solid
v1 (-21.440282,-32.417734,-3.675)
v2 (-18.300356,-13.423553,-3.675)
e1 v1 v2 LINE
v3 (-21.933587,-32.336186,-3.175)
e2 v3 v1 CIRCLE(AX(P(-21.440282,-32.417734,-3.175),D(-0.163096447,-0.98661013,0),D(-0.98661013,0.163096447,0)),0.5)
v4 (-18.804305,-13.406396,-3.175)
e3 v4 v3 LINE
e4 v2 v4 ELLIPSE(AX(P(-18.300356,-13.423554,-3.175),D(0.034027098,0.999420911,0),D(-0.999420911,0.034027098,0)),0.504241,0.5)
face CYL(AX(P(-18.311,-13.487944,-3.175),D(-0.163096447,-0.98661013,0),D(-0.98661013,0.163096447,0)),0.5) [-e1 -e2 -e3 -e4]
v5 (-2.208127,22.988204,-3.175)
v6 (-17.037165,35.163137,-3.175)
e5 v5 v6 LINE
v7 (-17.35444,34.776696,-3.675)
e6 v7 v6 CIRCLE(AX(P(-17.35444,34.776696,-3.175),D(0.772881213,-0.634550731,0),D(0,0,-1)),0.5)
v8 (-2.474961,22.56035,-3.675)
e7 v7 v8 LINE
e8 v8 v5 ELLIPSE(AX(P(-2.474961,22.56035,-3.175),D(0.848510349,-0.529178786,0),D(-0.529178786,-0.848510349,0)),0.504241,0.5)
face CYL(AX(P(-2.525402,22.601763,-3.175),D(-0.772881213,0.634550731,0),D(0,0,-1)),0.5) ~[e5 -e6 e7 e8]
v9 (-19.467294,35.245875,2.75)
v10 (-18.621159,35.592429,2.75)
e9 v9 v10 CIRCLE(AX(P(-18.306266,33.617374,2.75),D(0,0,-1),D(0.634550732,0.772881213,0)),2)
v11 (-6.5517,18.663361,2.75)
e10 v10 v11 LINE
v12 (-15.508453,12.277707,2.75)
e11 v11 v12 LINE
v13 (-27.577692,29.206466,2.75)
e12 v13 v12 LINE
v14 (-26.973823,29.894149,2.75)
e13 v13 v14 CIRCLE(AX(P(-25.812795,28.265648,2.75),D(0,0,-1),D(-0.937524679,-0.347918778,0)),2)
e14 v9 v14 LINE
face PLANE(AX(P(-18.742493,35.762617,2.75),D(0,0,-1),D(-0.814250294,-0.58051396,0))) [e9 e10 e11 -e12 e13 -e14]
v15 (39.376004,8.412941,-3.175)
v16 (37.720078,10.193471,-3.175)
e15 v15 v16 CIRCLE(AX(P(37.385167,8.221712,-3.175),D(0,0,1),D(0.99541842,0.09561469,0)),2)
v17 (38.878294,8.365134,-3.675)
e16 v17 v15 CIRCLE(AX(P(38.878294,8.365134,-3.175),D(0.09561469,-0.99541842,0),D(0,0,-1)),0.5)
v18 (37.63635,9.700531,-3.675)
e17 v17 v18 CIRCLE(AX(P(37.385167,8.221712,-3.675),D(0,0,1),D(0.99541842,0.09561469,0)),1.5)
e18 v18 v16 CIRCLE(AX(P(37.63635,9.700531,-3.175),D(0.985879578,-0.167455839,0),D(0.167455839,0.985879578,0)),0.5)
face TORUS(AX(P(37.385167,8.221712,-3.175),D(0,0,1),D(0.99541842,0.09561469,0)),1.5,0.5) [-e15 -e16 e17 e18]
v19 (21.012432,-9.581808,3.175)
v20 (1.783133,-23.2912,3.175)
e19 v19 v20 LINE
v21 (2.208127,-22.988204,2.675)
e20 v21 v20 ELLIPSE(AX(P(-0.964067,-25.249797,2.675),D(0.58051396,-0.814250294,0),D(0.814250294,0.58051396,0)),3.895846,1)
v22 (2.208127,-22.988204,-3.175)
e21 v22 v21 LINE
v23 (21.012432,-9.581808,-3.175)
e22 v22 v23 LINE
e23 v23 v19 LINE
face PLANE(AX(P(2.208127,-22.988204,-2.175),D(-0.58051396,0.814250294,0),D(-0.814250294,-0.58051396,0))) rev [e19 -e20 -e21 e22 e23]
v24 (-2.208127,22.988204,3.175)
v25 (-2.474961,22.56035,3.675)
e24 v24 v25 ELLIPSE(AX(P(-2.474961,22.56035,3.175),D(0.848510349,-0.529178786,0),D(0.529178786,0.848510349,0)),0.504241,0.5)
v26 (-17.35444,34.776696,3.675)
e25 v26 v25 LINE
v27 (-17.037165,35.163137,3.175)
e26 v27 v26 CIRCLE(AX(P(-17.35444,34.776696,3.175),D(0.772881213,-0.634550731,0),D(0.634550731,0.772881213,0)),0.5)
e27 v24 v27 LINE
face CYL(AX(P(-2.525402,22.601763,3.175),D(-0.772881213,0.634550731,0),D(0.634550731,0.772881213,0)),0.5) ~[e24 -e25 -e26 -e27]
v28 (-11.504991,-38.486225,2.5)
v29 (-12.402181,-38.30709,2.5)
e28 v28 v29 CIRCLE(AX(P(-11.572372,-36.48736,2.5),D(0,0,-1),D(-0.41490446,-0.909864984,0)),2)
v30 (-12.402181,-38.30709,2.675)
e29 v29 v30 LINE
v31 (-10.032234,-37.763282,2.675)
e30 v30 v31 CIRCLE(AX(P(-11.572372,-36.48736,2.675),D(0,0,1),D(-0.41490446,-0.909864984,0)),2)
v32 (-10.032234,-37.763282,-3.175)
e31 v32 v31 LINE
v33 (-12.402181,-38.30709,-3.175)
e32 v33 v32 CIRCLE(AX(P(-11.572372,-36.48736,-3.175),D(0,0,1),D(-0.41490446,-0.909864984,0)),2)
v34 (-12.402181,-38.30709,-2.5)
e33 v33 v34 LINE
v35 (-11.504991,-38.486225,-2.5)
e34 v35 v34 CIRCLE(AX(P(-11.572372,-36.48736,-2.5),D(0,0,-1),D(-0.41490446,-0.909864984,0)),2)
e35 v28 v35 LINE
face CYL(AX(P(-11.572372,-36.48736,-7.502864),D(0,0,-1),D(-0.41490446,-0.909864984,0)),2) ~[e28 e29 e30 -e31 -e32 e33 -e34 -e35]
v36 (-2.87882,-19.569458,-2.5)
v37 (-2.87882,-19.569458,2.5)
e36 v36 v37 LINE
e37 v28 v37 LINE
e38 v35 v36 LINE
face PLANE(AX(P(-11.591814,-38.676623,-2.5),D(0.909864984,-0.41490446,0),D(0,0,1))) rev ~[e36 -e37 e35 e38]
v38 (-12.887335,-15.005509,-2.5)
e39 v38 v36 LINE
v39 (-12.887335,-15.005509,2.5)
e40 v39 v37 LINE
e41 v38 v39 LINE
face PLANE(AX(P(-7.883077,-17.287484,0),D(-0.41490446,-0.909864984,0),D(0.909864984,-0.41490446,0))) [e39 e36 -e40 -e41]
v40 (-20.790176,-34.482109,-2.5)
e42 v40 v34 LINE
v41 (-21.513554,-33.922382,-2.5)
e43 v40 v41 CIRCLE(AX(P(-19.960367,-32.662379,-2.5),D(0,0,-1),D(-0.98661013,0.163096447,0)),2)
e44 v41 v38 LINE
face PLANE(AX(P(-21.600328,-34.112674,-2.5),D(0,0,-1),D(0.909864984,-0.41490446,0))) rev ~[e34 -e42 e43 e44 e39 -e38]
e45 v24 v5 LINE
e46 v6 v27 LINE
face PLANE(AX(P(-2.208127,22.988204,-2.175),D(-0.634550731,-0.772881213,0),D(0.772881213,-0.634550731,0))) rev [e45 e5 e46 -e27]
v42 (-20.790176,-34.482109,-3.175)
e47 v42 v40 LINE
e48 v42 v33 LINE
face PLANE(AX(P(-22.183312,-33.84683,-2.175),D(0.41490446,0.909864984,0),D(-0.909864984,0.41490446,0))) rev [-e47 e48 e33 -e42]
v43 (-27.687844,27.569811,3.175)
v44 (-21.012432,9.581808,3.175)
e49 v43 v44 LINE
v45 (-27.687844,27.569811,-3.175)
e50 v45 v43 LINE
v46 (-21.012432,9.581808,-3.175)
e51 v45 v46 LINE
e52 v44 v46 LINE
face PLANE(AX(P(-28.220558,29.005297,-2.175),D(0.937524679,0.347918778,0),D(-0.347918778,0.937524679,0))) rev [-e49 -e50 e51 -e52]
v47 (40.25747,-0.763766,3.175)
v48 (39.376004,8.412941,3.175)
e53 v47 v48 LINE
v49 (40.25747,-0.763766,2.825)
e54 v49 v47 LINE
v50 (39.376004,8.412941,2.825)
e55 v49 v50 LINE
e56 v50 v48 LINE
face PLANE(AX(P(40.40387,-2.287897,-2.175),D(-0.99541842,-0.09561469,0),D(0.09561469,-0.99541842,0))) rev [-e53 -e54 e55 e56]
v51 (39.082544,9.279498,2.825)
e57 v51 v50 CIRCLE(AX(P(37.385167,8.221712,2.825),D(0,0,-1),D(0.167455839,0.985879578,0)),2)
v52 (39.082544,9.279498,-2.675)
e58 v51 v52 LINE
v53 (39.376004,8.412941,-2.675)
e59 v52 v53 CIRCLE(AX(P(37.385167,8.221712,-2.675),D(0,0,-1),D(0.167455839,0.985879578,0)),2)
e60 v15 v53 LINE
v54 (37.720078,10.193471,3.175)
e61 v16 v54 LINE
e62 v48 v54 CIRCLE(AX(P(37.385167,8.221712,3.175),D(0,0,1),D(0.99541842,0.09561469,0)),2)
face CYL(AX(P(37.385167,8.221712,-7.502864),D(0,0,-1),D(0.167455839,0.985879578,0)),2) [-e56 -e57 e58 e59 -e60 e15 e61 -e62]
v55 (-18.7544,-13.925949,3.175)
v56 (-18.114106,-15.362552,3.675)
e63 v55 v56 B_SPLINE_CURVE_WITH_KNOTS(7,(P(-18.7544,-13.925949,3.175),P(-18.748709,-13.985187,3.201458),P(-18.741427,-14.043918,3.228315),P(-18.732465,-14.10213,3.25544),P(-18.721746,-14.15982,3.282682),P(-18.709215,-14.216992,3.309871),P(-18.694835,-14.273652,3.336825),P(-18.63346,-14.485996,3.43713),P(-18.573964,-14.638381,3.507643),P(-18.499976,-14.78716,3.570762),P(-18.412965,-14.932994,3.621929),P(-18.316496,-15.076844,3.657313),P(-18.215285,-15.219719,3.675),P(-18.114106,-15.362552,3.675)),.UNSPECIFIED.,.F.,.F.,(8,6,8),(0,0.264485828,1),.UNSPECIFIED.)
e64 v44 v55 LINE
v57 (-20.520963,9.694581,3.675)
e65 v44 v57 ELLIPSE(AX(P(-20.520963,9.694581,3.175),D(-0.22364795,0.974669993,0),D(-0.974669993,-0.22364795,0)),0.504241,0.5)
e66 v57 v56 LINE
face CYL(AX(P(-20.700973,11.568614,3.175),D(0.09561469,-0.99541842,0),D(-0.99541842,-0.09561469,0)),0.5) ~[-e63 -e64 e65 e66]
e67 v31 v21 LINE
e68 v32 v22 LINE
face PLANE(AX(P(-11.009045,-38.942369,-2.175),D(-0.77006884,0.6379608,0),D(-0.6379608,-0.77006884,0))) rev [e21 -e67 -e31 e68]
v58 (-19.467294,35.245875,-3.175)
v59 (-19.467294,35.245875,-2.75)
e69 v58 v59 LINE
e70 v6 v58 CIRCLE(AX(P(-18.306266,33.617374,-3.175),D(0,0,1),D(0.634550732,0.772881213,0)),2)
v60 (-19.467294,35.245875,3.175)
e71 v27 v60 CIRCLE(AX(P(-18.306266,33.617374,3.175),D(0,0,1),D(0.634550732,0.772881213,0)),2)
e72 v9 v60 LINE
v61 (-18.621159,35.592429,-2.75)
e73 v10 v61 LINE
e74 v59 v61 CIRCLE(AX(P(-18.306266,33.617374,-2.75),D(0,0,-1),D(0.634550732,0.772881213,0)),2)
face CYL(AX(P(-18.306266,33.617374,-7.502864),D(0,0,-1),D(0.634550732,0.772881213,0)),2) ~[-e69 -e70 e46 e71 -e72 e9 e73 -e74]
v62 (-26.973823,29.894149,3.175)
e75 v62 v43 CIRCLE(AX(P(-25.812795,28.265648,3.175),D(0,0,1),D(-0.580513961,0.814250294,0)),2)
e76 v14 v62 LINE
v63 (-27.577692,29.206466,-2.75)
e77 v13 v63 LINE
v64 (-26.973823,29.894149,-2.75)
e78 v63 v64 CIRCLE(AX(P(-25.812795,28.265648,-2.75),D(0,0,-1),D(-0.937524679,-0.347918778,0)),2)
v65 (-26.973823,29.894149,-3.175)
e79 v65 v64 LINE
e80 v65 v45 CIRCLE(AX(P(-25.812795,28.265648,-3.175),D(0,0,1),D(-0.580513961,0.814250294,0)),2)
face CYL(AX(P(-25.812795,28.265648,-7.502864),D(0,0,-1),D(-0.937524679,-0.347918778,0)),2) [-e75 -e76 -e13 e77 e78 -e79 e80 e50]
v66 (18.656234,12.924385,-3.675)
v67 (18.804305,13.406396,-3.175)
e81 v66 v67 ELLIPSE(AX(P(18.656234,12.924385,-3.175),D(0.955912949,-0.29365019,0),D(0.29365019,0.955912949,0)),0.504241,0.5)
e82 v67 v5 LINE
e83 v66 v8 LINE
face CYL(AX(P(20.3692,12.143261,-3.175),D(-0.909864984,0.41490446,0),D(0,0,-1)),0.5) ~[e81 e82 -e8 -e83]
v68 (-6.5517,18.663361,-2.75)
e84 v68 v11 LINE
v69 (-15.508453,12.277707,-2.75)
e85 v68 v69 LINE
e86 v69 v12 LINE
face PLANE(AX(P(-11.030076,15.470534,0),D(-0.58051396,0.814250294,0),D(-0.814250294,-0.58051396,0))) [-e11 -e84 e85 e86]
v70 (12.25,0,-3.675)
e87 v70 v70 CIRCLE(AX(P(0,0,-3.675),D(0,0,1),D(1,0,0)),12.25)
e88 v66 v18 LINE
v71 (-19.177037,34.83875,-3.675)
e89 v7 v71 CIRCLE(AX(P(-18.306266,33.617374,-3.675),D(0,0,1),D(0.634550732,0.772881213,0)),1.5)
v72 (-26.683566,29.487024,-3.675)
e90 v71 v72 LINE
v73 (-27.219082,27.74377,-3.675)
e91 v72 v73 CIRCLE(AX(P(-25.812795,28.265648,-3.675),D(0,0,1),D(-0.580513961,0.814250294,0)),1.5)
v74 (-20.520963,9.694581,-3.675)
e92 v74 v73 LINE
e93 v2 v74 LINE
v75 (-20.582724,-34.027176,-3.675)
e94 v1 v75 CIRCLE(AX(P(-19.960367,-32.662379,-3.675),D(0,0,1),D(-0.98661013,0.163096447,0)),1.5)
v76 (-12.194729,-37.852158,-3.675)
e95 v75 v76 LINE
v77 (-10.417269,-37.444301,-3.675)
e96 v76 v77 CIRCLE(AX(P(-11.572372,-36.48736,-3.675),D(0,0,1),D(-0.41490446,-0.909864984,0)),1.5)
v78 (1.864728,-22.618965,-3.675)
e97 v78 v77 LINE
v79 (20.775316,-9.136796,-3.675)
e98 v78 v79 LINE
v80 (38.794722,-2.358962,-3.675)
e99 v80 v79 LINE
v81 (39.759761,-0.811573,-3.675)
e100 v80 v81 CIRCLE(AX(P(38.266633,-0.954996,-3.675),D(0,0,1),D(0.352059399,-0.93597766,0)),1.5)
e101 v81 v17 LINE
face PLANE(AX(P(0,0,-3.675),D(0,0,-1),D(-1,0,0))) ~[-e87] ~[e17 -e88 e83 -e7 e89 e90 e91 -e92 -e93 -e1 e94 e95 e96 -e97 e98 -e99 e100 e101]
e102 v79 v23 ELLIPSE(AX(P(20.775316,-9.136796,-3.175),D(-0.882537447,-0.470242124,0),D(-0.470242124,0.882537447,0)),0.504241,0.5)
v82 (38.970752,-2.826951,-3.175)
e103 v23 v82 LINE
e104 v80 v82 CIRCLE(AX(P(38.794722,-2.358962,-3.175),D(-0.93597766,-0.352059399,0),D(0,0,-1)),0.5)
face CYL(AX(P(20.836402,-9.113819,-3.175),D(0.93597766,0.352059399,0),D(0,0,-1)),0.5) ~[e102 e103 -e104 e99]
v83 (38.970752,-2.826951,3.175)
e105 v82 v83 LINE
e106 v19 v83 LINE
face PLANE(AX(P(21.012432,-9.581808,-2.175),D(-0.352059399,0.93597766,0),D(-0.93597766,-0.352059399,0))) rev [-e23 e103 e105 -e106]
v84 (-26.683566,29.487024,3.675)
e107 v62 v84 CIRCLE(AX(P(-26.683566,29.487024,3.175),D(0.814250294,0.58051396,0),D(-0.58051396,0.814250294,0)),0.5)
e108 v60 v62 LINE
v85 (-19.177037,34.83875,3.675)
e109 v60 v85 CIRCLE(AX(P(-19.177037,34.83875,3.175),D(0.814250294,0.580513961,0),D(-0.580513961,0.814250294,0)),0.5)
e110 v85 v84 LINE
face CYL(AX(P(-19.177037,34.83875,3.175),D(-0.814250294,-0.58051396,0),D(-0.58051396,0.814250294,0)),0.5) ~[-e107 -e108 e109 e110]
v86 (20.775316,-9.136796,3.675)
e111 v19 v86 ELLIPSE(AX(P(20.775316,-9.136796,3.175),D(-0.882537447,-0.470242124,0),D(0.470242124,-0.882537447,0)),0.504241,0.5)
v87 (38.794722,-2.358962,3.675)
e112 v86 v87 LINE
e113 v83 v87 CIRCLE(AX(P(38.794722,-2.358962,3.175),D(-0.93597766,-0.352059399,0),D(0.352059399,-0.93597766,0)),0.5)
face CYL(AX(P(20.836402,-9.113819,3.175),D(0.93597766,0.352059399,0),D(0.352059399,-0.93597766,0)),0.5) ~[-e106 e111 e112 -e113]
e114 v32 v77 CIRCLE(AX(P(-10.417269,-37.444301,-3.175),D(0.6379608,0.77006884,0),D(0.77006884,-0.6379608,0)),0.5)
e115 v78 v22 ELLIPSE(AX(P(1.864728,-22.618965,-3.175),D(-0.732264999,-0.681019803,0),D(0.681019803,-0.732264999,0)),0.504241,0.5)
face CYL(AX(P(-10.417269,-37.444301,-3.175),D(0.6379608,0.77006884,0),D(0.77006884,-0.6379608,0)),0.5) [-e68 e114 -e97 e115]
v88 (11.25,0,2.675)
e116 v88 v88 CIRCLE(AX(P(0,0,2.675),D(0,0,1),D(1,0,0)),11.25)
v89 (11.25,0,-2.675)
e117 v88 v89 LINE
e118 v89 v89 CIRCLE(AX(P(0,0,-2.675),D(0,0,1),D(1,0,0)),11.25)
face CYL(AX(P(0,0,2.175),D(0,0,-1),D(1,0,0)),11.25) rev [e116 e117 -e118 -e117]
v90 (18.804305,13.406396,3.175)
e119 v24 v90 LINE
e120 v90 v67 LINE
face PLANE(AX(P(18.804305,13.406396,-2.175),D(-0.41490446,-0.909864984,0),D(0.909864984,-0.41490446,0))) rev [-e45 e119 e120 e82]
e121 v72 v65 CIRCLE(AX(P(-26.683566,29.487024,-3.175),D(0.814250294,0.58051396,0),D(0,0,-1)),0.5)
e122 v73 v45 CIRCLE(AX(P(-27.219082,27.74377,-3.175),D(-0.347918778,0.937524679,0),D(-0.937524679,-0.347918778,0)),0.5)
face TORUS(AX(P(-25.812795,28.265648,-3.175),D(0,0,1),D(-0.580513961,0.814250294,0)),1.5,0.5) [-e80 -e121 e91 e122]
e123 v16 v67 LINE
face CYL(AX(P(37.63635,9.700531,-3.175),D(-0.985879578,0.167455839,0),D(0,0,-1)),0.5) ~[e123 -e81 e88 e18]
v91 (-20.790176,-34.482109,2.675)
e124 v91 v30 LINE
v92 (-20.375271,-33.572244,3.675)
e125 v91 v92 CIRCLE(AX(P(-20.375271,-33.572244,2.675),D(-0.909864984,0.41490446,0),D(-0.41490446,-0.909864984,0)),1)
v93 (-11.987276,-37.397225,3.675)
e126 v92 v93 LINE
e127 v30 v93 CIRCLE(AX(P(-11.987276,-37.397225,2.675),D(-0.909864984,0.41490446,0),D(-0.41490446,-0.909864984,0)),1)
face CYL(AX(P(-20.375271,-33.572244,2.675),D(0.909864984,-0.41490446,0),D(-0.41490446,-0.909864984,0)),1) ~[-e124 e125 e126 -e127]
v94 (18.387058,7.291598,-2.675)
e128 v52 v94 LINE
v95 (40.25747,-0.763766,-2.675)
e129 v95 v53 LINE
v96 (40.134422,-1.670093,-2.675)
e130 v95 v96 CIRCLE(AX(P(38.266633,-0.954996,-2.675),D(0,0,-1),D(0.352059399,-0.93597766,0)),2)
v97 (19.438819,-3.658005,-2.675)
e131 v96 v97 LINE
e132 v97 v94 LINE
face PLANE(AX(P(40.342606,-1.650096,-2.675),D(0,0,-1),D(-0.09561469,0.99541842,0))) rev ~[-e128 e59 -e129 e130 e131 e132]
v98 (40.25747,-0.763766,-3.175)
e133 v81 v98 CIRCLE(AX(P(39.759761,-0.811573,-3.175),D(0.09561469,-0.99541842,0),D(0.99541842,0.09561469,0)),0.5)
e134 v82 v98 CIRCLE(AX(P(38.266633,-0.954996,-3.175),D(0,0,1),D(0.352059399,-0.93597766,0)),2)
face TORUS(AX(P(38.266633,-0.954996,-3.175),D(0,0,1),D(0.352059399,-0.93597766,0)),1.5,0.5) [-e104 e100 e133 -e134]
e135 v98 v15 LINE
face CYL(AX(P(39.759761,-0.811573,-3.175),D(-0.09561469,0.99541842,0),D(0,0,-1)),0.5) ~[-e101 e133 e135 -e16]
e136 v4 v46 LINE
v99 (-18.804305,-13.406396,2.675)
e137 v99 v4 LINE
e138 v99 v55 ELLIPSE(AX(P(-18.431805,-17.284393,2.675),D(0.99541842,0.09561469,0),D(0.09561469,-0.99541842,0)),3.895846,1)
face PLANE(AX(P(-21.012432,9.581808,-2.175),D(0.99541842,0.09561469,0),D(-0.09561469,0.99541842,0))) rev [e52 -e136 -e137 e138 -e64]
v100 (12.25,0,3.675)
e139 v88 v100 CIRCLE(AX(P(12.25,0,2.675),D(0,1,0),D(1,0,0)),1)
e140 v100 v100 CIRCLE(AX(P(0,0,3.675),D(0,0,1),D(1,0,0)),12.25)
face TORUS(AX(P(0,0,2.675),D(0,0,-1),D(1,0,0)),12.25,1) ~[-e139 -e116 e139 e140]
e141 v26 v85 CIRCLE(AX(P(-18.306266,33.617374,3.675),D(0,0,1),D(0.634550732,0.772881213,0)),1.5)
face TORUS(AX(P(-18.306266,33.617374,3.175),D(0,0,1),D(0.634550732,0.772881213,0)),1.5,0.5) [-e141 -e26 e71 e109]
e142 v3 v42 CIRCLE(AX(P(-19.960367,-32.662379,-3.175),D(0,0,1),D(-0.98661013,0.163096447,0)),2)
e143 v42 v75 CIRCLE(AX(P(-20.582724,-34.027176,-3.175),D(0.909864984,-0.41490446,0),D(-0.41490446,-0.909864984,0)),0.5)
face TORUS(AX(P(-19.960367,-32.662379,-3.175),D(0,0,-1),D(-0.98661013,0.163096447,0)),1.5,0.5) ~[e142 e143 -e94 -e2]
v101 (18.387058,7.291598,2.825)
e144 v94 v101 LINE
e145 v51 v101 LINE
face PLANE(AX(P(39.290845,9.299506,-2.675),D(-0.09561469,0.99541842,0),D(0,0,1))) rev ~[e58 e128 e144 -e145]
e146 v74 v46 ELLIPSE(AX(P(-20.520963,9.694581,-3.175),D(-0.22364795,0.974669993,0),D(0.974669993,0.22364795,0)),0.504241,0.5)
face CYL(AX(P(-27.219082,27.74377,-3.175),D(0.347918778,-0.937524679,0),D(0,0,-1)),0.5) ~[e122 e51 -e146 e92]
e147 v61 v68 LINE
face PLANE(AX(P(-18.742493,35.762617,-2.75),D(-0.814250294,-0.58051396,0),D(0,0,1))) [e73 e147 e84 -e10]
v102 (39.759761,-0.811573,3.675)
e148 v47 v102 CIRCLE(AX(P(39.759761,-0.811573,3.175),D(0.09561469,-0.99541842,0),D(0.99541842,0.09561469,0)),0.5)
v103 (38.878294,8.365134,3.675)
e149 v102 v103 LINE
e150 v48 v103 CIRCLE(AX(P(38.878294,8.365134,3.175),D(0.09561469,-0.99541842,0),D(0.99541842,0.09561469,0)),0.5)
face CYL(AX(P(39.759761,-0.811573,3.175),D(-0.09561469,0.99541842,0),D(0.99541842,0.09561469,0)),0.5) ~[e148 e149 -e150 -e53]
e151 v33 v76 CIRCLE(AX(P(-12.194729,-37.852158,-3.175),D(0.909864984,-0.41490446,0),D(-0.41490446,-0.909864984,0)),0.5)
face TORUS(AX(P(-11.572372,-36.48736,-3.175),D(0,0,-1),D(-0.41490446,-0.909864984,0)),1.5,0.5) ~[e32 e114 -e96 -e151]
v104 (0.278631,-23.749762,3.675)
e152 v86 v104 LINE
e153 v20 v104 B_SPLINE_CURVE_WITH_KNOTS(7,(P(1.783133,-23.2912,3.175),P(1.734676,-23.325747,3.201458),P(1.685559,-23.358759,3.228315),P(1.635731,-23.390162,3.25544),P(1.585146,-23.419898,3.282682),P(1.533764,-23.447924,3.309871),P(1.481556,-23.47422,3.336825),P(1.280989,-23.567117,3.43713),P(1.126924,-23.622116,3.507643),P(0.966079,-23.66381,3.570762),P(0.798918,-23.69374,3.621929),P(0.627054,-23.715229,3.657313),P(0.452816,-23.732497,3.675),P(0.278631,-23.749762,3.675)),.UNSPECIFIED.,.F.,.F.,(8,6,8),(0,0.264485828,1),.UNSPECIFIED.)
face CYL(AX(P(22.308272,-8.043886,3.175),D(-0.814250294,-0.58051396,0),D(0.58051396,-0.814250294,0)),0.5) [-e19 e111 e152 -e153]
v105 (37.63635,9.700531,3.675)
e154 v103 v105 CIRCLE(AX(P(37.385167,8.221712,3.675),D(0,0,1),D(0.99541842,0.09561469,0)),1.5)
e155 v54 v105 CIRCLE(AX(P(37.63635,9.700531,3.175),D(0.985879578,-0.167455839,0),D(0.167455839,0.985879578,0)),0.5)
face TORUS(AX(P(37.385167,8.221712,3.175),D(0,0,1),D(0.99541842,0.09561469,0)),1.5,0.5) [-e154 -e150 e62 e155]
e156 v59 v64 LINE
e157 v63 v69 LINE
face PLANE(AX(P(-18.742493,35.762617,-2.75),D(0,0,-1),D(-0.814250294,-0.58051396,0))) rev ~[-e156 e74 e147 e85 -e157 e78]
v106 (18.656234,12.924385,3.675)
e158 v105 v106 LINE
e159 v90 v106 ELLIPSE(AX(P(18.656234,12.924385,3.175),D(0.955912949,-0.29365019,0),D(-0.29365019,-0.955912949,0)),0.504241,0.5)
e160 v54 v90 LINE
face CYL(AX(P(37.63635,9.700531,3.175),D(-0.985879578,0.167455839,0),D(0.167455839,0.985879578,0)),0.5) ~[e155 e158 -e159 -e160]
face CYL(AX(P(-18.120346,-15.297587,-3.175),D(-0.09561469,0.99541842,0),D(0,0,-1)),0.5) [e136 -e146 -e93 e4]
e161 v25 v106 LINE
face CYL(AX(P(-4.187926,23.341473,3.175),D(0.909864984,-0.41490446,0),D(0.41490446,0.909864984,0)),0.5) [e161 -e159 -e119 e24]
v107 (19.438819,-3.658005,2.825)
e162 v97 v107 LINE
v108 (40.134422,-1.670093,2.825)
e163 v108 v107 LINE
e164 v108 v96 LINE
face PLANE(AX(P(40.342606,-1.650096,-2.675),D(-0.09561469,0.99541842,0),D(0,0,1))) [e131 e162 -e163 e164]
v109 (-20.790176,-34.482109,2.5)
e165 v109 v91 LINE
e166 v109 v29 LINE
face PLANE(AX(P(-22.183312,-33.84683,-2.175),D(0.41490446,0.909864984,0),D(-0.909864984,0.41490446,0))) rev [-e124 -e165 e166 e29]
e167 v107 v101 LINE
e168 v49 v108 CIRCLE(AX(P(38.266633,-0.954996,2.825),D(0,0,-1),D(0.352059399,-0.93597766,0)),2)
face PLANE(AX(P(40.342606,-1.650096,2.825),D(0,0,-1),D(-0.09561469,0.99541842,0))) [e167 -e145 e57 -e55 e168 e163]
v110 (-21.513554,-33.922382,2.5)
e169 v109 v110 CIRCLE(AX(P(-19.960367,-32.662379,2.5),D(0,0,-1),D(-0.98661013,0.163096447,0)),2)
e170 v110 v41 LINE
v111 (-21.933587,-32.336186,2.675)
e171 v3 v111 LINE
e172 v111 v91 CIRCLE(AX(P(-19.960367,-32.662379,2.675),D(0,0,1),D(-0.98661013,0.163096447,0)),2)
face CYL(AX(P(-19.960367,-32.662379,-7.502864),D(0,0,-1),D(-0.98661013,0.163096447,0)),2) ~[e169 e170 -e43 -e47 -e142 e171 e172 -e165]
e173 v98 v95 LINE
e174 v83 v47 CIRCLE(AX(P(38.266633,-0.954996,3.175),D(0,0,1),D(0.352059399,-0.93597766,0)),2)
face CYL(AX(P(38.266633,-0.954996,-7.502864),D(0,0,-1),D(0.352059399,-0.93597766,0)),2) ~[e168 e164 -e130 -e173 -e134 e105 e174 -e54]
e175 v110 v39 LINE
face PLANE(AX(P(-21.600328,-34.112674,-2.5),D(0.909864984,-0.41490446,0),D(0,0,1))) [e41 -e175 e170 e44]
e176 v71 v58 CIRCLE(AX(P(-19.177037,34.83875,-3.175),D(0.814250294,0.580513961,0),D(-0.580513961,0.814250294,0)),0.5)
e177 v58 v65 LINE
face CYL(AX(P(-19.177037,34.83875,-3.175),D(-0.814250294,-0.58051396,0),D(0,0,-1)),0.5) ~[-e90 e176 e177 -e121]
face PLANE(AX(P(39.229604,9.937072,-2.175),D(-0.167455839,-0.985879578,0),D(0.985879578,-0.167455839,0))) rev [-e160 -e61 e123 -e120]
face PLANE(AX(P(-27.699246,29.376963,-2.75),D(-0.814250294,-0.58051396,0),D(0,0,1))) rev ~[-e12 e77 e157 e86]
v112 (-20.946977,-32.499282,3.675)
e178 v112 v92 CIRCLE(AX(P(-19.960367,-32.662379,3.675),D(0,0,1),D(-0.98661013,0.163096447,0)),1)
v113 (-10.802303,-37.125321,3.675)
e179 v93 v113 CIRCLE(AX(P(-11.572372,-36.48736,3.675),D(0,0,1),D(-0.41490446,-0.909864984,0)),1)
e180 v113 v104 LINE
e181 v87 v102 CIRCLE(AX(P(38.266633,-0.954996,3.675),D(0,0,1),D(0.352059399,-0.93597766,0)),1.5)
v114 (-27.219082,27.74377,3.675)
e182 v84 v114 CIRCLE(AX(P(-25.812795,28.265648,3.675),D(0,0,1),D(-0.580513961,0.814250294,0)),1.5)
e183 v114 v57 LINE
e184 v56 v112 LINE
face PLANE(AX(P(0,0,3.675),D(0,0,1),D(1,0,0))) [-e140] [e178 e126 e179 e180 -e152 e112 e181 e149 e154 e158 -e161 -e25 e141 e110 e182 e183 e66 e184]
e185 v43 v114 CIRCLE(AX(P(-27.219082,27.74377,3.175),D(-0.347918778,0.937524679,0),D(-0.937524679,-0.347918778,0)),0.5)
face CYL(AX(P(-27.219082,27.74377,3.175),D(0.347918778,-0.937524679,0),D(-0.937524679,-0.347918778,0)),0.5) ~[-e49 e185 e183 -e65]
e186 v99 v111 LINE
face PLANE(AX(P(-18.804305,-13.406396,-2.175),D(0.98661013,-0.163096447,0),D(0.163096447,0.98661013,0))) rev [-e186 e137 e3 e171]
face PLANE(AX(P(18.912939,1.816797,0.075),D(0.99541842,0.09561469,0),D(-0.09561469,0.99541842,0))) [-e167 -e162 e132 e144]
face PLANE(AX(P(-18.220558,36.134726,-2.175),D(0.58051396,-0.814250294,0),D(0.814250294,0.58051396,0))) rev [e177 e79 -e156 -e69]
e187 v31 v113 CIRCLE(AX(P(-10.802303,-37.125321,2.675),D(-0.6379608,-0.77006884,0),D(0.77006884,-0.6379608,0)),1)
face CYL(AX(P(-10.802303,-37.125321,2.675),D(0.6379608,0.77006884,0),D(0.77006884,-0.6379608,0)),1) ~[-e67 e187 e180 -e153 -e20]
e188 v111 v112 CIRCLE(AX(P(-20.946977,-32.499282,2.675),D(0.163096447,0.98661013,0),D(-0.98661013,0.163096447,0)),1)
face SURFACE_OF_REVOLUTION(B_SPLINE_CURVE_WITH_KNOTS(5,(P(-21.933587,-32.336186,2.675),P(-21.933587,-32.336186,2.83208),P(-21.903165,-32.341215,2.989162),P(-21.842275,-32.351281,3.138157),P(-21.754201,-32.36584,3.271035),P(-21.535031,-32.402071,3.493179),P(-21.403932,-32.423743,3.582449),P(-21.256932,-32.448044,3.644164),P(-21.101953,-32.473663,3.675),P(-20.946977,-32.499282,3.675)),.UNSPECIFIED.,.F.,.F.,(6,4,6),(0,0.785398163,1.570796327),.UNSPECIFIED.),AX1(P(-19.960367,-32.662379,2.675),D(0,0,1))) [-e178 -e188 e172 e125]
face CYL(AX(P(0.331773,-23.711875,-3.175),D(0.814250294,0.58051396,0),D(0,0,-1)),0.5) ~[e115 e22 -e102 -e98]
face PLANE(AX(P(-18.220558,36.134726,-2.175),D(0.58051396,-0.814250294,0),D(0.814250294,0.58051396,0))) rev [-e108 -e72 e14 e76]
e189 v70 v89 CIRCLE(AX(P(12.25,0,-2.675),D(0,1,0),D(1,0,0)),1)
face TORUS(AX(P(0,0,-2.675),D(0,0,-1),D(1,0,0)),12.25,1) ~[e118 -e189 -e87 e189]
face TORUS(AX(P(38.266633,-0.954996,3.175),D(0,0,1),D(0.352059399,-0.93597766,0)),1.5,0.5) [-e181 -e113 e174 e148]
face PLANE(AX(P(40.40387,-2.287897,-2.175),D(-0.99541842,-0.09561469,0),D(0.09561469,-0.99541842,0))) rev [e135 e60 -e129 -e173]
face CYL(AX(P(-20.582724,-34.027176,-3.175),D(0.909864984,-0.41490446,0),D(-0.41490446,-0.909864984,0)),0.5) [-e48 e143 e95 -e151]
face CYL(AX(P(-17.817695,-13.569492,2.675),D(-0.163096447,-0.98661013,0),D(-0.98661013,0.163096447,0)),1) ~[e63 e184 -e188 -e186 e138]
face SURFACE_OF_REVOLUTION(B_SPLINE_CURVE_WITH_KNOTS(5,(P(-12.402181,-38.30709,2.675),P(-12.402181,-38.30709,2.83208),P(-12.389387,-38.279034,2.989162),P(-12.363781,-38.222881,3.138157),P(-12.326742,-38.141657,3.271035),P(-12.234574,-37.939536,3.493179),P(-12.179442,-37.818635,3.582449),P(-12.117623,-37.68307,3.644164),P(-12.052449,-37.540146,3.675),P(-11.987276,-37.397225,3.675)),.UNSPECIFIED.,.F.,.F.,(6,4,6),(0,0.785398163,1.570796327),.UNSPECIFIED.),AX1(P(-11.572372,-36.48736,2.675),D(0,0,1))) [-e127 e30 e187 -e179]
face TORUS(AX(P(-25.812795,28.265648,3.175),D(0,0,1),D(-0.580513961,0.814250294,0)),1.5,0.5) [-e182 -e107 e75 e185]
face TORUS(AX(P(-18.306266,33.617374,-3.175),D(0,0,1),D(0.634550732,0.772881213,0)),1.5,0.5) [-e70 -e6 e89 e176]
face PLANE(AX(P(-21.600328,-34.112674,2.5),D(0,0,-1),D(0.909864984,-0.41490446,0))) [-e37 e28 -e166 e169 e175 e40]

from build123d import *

# Parameters (mm, degrees)
F0_R         = 11.25
F1_DEPTH     = 2.175
F2_R         = 11.25
F3_DEPTH     = 1.5
F5_W         = 11
F5_H         = 5.5
F6_DEPTH     = 21
F7_W         = 11
F7_H         = 5.5
F8_DEPTH     = 21
F9_W         = 11
F9_H         = 5
F10_DEPTH    = 21
F11_T1_DEPTH = 15.005727874
F12_R        = 1
F13_R        = 0.5
F14_R        = 0.5
F15_R        = 0.5
F16_R        = 0.5
F17_R        = 0.5
F18_R        = 0.5
F19_R        = 0.5
F20_R        = 1


# Not quite as in the source:
# - a fillet or chamfer that OpenCascade refuses, or shapes differently, is made with other operations: its cross-section is extruded or revolved along the edge and cut away or added


with BuildPart() as f1:
    # F0 (on Top) → F1 (new body, symmetric)
    with BuildSketch(Plane.XY):
        Polygon((-2.2081266769, 22.9882037122), (-21.0124317406, 9.5818080591), (-18.8043050636, -13.4063956531), (2.2081266769, -22.9882037122), (21.0124317406, -9.5818080591), (18.8043050636, 13.4063956531), align=None)
        Circle(F0_R, mode=Mode.SUBTRACT)
        Polygon((-28.2205584175, 29.0052973062), (-21.0124317406, 9.5818080591), (-2.2081266769, 22.9882037122), (-18.2205584175, 36.1347262363), align=None)
        Polygon((2.2081266769, -22.9882037122), (-18.8043050636, -13.4063956531), (-22.1833116707, -33.8468295789), (-11.0090451027, -38.9423691517), align=None)
        Polygon((39.2296035202, 9.9370718455), (18.8043050636, 13.4063956531), (21.0124317406, -9.5818080591), (40.4038700882, -2.2878966574), align=None)
    extrude(amount=F1_DEPTH, both=True)

    # F2 (on face) → F3 (join)
    with BuildSketch(Plane.XY.offset(2.175)):
        Polygon((-18.8043050636, -13.4063956531), (-22.1833116707, -33.8468295789), (-11.0090451027, -38.9423691517), (2.2081266769, -22.9882037122), (21.0124317406, -9.5818080591), (40.4038700882, -2.2878966574), (39.2296035202, 9.9370718455), (18.8043050636, 13.4063956531), (-2.2081266769, 22.9882037122), (-18.2205584175, 36.1347262363), (-28.2205584175, 29.0052973062), (-21.0124317406, 9.5818080591), align=None)
        Circle(F2_R, mode=Mode.SUBTRACT)
    extrude(amount=F3_DEPTH)

    # F4: F1 across plane


with BuildPart() as f1_1:
    add(f1.part)
    add(f1.part.mirror(Plane.XY))

    # F5 (on face) → F6 (cut)
    with BuildSketch(Plane(origin=(39.8167368042, 3.824587594, 0), x_dir=(-0.0956146899, 0.9954184201, 0), z_dir=(0.9954184201, 0.0956146899, 0))):
        with Locations((0.0001179833, 0.075)):
            Rectangle(F5_W, F5_H)
    extrude(amount=-F6_DEPTH, mode=Mode.SUBTRACT)

    # F7 (on face) → F8 (cut)
    with BuildSketch(Plane(origin=(-23.2205584175, 32.5700117712, 0), x_dir=(-0.8142502943, -0.5805139604, 0), z_dir=(-0.5805139604, 0.8142502943, 0))):
        with Locations((0.0003820167, 0)):
            Rectangle(F7_W, F7_H)
    extrude(amount=-F8_DEPTH, mode=Mode.SUBTRACT)

    # F9 (on face) → F10 (cut)
    with BuildSketch(Plane(origin=(-16.5961783867, -36.3945993653, 0), x_dir=(0.9098649841, -0.4149044597, 0), z_dir=(-0.4149044597, -0.9098649841, 0))):
        with Locations((0.0001179833, 0)):
            Rectangle(F9_W, F9_H)
    extrude(amount=-F10_DEPTH, mode=Mode.SUBTRACT)

    # F11: fillet of radius 2 on 6 edges, made by hand

    # F11_s2 → F11_t1 (cut)
    with BuildSketch(Plane.XY.offset(-7.502863937)):
        with BuildLine():
            ThreePointArc((-17.0371647686, 35.1631366918), (-18.2382120361, 35.6162160874), (-19.4672941524, 35.2458748546))
            Line((-19.4672941524, 35.2458748546), (-18.2205584175, 36.1347262363))
            Line((-18.2205584175, 36.1347262363), (-17.0371647686, 35.1631366918))
        make_face()
        with BuildLine():
            ThreePointArc((-27.6878441198, 27.5698105427), (-27.7246206597, 28.8529484789), (-26.9738226827, 29.8941486878))
            Line((-26.9738226827, 29.8941486878), (-28.2205584175, 29.0052973062))
            Line((-28.2205584175, 29.0052973062), (-27.6878441198, 27.5698105427))
        make_face()
        with BuildLine():
            ThreePointArc((-21.9335872676, -32.336185844), (-21.7254419003, -33.6028629865), (-20.7901759265, -34.4821087062))
            Line((-20.7901759265, -34.4821087062), (-22.1833116707, -33.8468295789))
            Line((-22.1833116707, -33.8468295789), (-21.9335872676, -32.336185844))
        make_face()
        with BuildLine():
            ThreePointArc((-12.4021808468, -38.3070900243), (-11.125076027, -38.4367000411), (-10.0322342476, -37.7632816551))
            Line((-10.0322342476, -37.7632816551), (-11.0090451027, -38.9423691517))
            Line((-11.0090451027, -38.9423691517), (-12.4021808468, -38.3070900243))
        make_face()
        with BuildLine():
            ThreePointArc((38.9707520362, -2.8269508478), (39.9636539364, -2.0133531008), (40.2574700789, -0.7637661484))
            Line((40.2574700789, -0.7637661484), (40.4038700882, -2.2878966574))
            Line((40.4038700882, -2.2878966574), (38.9707520362, -2.8269508478))
        make_face()
        with BuildLine():
            ThreePointArc((37.7200783674, 10.1934711124), (38.8496966867, 9.5837515621), (39.3760035295, 8.4129413364))
            Line((39.3760035295, 8.4129413364), (39.2296035202, 9.9370718455))
            Line((39.2296035202, 9.9370718455), (37.7200783674, 10.1934711124))
        make_face()
    extrude(amount=F11_T1_DEPTH, mode=Mode.SUBTRACT)

    # F12
    f12_edges = [f1_1.edges().sort_by_distance(p)[0] for p in [
        (-16.596178, -36.394599, 3.675),
    ]]
    fillet(f12_edges, radius=F12_R)

    # F13
    f13_edges = [f1_1.edges().sort_by_distance(p)[0] for p in [
        (29.991592, -6.204379, 3.675),
    ]]
    fillet(f13_edges, radius=F13_R)

    # F14
    f14_edges = [f1_1.edges().sort_by_distance(p)[0] for p in [
        (-23.220558, 32.570012, 3.675),
    ]]
    fillet(f14_edges, radius=F14_R)

    # F15
    f15_edges = [f1_1.edges().sort_by_distance(p)[0] for p in [
        (-19.908368, -1.912294, 3.675),
        (11.610279, -16.285006, 3.675),
        (8.298089, 18.1973, 3.675),
    ]]
    fillet(f15_edges, radius=F15_R)

    # F16
    f16_edges = [f1_1.edges().sort_by_distance(p)[0] for p in [
        (-24.350138, 18.575809, -3.675),
    ]]
    fillet(f16_edges, radius=F16_R)

    # F17
    f17_edges = [f1_1.edges().sort_by_distance(p)[0] for p in [
        (28.262192, 11.799933, -3.675),
    ]]
    fillet(f17_edges, radius=F17_R)

    # F18
    f18_edges = [f1_1.edges().sort_by_distance(p)[0] for p in [
        (-3.912054, -30.375743, -3.675),
    ]]
    fillet(f18_edges, radius=F18_R)

    # F19
    f19_edges = [f1_1.edges().sort_by_distance(p)[0] for p in [
        (-19.908368, -1.912294, -3.675),
        (11.610279, -16.285006, -3.675),
        (8.298089, 18.1973, -3.675),
    ]]
    fillet(f19_edges, radius=F19_R)

    # F20
    f20_edges = [f1_1.edges().sort_by_distance(p)[0] for p in [
        (-11.25, 0, 3.675),
        (-11.25, 0, -3.675),
    ]]
    fillet(f20_edges, radius=F20_R)


solid = f1_1.part
